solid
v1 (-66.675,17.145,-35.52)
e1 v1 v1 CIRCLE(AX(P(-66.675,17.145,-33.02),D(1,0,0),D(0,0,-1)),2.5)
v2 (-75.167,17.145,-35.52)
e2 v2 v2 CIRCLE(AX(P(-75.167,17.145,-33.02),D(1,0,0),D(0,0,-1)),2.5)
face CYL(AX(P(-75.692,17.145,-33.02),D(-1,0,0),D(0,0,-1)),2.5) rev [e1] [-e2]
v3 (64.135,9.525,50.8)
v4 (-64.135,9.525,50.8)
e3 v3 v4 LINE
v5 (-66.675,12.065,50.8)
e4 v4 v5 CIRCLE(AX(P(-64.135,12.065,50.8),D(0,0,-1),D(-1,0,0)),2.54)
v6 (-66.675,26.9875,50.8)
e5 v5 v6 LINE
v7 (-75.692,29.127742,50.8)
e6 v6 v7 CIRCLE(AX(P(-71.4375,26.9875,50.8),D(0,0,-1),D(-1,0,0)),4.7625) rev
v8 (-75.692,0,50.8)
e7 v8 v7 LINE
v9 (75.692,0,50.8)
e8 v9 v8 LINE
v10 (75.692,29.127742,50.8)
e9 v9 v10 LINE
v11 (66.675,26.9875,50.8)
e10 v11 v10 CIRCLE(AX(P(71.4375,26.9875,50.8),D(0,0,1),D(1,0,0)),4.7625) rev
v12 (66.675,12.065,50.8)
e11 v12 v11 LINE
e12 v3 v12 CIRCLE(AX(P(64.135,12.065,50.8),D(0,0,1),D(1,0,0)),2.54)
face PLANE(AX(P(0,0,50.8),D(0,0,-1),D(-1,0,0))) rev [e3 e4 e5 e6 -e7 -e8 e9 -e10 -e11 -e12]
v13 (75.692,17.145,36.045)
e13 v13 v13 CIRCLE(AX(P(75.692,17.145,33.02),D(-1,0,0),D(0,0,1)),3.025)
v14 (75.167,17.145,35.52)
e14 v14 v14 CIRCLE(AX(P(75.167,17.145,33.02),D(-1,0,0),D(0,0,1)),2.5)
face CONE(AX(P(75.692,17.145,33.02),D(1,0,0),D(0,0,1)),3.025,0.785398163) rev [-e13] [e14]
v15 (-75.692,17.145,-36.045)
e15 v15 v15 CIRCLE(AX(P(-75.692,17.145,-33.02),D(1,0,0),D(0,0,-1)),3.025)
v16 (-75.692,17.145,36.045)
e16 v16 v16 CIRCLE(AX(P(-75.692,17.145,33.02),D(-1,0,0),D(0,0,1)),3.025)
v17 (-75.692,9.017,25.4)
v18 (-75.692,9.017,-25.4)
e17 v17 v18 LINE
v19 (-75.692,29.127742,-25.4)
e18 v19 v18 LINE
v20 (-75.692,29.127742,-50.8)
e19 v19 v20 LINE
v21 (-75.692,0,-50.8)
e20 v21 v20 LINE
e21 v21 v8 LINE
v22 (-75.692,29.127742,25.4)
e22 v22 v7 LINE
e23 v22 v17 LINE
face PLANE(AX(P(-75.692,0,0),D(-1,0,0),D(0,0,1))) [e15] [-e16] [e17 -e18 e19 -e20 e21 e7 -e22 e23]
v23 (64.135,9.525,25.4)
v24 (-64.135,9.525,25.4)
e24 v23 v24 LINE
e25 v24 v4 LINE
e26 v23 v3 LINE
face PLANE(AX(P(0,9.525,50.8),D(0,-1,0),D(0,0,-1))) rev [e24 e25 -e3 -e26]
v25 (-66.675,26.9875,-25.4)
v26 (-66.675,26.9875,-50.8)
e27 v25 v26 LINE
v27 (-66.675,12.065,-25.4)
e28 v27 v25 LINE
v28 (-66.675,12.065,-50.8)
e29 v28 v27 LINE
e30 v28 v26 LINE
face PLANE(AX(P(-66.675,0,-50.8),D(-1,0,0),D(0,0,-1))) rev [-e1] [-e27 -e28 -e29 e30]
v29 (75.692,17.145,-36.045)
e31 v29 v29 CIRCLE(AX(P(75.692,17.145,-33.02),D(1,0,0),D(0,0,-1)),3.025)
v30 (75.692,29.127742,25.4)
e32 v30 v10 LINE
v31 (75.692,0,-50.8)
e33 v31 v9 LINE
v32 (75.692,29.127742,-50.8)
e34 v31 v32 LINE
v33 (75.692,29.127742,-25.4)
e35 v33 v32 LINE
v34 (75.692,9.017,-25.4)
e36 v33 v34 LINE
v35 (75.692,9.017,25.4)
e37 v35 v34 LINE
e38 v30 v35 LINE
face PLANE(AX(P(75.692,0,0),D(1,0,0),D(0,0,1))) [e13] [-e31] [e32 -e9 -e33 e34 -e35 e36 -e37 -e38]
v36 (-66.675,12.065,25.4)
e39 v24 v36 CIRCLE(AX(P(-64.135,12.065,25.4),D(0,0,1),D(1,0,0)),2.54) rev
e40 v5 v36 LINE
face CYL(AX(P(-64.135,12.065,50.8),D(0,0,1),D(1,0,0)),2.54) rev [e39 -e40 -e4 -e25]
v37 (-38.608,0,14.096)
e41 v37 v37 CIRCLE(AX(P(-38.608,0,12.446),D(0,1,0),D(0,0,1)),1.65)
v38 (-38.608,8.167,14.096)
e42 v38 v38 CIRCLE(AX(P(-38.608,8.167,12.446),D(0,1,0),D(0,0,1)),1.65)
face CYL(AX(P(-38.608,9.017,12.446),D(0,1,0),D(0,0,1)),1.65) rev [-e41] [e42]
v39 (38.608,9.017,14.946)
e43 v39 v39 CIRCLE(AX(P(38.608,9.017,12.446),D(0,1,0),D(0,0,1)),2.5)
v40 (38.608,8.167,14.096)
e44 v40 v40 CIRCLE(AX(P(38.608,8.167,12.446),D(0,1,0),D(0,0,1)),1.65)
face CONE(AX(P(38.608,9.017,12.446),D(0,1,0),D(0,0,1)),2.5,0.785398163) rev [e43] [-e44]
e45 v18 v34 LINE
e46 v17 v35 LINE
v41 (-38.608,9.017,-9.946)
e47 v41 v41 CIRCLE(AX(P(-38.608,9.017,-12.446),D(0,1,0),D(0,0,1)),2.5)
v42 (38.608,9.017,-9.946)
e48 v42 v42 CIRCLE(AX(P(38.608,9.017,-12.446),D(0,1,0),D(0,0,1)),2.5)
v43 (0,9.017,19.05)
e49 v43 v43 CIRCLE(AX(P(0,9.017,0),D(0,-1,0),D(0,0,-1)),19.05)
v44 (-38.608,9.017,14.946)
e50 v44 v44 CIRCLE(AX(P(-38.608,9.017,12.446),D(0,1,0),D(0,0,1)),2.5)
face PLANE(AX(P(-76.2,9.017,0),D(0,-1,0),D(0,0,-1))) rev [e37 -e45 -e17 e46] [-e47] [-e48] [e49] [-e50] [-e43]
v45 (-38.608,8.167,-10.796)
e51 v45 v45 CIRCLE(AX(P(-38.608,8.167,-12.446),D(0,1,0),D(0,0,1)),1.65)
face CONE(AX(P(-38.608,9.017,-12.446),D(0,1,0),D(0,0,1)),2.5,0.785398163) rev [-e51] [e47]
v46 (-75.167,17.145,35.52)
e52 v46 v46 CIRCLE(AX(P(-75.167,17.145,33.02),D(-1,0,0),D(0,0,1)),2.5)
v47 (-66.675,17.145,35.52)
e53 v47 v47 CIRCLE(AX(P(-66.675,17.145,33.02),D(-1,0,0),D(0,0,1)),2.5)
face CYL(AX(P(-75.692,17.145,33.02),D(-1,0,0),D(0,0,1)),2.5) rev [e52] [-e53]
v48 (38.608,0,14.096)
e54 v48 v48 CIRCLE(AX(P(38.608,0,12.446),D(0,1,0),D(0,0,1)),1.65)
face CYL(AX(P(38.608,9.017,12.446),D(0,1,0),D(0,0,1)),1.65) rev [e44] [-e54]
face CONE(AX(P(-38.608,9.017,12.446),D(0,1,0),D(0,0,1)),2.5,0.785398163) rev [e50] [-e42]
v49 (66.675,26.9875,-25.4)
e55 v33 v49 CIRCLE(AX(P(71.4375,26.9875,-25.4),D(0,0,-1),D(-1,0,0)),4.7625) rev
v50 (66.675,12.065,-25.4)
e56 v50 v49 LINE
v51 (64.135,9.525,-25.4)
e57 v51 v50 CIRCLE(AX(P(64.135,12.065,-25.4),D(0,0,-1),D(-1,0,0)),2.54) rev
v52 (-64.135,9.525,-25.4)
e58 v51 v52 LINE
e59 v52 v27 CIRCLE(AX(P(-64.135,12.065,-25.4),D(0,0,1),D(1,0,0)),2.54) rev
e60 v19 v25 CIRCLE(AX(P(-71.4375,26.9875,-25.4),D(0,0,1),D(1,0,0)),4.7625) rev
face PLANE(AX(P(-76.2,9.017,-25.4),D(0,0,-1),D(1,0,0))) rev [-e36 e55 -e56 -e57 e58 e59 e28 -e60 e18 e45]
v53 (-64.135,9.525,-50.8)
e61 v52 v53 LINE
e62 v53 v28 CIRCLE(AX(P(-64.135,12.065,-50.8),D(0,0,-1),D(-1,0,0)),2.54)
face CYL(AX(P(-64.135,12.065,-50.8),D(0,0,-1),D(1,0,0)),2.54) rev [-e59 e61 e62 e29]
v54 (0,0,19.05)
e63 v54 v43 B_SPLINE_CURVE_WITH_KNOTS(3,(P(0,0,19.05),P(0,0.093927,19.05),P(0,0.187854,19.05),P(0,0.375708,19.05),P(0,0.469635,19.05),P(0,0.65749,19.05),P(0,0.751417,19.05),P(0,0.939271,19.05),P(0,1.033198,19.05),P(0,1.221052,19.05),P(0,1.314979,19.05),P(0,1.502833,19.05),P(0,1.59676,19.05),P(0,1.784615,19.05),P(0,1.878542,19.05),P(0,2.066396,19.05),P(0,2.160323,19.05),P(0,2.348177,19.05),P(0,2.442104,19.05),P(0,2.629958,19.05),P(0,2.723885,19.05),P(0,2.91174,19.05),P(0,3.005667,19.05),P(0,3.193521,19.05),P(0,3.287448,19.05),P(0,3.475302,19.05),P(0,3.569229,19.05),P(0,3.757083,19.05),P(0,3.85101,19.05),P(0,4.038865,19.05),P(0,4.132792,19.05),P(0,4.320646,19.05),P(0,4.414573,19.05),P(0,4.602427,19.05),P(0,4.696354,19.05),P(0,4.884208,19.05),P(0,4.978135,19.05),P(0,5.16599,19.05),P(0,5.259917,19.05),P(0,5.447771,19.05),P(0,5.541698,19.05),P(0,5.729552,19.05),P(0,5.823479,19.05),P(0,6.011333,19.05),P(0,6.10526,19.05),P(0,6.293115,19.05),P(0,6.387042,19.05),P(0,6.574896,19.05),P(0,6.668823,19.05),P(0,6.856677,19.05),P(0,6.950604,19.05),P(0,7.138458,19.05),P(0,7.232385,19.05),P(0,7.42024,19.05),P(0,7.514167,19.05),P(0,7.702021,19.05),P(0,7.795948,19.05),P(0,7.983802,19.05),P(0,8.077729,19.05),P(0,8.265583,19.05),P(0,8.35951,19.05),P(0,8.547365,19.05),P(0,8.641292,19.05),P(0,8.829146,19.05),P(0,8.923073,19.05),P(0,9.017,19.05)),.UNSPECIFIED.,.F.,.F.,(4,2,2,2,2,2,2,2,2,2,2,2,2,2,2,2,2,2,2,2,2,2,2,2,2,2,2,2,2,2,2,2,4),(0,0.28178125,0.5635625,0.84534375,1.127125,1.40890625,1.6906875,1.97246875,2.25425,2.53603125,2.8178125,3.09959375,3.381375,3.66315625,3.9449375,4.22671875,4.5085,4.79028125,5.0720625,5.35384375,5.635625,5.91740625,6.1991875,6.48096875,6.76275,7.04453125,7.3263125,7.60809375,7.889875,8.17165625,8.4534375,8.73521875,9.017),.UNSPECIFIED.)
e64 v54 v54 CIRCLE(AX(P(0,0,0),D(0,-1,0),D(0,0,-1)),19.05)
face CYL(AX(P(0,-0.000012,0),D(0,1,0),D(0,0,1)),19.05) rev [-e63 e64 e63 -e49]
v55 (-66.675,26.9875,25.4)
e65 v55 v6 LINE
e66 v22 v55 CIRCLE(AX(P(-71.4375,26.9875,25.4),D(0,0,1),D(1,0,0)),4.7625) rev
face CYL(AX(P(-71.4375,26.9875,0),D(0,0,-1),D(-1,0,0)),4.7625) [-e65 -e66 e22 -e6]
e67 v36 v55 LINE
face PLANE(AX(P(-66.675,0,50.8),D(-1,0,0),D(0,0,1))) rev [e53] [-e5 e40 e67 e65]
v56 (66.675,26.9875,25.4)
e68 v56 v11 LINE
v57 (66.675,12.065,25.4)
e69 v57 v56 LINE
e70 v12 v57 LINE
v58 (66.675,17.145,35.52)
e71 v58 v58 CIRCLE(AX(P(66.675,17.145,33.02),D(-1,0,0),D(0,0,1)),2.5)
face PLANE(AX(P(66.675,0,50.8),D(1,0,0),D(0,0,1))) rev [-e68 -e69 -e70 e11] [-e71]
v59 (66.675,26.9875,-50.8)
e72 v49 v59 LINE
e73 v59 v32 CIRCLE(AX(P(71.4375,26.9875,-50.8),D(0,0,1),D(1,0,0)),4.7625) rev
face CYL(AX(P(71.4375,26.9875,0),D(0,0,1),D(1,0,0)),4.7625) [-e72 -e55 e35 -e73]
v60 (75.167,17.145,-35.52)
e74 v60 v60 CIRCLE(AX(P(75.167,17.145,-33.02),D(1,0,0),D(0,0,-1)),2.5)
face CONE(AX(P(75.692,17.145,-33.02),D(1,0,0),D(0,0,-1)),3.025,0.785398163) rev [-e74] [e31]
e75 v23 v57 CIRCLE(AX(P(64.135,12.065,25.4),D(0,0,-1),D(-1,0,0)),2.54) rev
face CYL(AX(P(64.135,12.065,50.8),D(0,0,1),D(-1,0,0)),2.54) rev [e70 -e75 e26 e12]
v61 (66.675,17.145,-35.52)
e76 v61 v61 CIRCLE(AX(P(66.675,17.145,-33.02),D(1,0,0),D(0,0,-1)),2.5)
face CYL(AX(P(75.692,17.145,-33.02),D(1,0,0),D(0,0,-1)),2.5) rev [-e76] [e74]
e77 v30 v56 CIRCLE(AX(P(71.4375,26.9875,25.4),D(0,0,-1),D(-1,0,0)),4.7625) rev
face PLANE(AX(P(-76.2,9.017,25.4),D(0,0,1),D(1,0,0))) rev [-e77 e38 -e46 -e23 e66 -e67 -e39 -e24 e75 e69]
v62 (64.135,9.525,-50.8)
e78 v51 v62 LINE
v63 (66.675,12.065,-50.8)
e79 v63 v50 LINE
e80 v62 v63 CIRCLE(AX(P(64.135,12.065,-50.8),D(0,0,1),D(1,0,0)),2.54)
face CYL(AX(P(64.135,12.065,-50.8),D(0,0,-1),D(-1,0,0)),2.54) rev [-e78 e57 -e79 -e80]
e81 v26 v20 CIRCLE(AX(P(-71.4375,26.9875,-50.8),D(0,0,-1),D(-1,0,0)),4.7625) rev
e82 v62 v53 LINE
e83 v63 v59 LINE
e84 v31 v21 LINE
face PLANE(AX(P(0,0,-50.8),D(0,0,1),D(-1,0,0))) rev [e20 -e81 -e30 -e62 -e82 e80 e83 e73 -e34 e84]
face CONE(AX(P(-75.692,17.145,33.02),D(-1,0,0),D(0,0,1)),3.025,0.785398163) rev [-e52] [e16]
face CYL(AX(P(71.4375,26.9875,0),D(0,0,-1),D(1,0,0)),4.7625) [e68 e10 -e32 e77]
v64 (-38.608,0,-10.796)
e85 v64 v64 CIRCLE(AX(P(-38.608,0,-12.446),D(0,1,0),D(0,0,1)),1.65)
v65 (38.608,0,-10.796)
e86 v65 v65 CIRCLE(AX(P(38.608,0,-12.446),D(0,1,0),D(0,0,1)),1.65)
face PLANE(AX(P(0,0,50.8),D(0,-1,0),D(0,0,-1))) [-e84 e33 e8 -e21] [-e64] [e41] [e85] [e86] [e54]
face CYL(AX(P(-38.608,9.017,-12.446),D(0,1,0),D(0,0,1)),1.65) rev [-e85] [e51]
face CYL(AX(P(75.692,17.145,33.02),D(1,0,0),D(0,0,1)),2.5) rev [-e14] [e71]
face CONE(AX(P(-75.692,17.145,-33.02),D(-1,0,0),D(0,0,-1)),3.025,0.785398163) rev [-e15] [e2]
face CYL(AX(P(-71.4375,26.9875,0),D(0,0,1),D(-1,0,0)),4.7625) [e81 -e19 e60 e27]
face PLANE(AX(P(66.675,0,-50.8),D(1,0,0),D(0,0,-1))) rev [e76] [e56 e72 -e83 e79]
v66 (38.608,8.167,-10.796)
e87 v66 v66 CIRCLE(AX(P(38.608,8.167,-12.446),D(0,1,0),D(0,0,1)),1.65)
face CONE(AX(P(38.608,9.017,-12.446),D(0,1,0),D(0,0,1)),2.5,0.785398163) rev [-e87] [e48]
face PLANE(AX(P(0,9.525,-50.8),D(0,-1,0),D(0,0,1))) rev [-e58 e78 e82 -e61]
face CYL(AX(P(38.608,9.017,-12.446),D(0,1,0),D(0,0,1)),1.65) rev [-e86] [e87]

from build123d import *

# Parameters (mm, degrees)
EXTRUDE_THIN1_DEPTH             = 50.8
FILLET1_RADIUS                  = 4.7625
FILLET1_LENGTH                  = 50.8
FILLET2_R                       = 2.54
CUT_EXTRUDE1_DEPTH              = 97.928543268
CUT_EXTRUDE1_DEPTH_BACK         = 97.928543268
SKETCH5_W                       = 25.4
SKETCH5_H                       = 22.733
CUT_EXTRUDE3_START              = -76.2
SKETCH8_W                       = 50.8
SKETCH8_H                       = 31.75
CUT_EXTRUDE3_DEPTH              = 0.508
M6X1_0_TAPPED_HOLE1_D           = 5
M6X1_0_TAPPED_HOLE1_CSINK_D     = 6.05
M6X1_0_TAPPED_HOLE1_CSINK_ANGLE = 90
MIRROR1_START                   = -50.8
MIRROR1_OUTLINE_W               = 151.384
MIRROR1_OUTLINE_H               = 9.017
MIRROR1_DEPTH                   = 101.6
MIRROR1_2_DEPTH                 = 15.2799999
MIRROR1_START_2                 = 35.5200001
MIRROR1_3_DEPTH                 = 15.2799999
MIRROR1_START_3                 = -30.5199999
MIRROR1_4_DEPTH                 = 5.1199999
MIRROR1_START_4                 = 25.4
MIRROR1_5_DEPTH                 = 5.1199999
MIRROR1_START_5                 = -35.5200001
MIRROR1_6_DEPTH                 = 5.0000002
MIRROR1_START_6                 = 30.5199999
MIRROR1_7_DEPTH                 = 5.0000002
CUT_EXTRUDE2_DEPTH              = 97.529691619
CUT_EXTRUDE2_DEPTH_BACK         = 97.529691619
SKETCH7_R                       = 19.05
M4X0_7_TAPPED_HOLE3_D           = 3.3
M4X0_7_TAPPED_HOLE3_CSINK_D     = 5
M4X0_7_TAPPED_HOLE3_CSINK_ANGLE = 90


with BuildPart() as part:
    # Sketch4 → Extrude-Thin1 (new body)
    with BuildSketch(Plane.XY):
        Polygon((0, 0), (-76.2, 0), (-76.2, 31.75), (-66.675, 31.75), (-66.675, 9.525), (0, 9.525), align=None)
    extrude(amount=EXTRUDE_THIN1_DEPTH)

    # Fillet1: full round fillet: the end face becomes a half cylinder, R = half its width
    fillet1_face = Plane((-71.4375, 31.75, 25.4), x_dir=(0, 0, -1), z_dir=(0, 1, 0))  # on the end face: x along it, z out of the body
    fillet1_slab = fillet1_face.offset(-FILLET1_RADIUS / 2) * Box(FILLET1_LENGTH, 2 * FILLET1_RADIUS, FILLET1_RADIUS, mode=Mode.PRIVATE)  # the body's end, R deep
    fillet1_round = Plane((-71.4375, 26.9875, 25.4), x_dir=(0, 1, 0), z_dir=(0, 0, -1)) * Cylinder(FILLET1_RADIUS, FILLET1_LENGTH, mode=Mode.PRIVATE)  # its axis R under the face
    add(fillet1_slab - fillet1_round, mode=Mode.SUBTRACT)

    # Fillet2
    fillet2_edges = [part.edges().sort_by_distance(p)[0] for p in [
        (-66.675, 9.525, 25.4),
    ]]
    fillet(fillet2_edges, radius=FILLET2_R)

    # Sketch5 → Cut-Extrude1 (cut, two sides: drawn at the far end of the back side and taken through both)
    with BuildSketch(Plane(origin=(0, 0, 0), x_dir=(0, 0, -1), z_dir=(1, 0, 0)).offset(-CUT_EXTRUDE1_DEPTH_BACK)):
        with Locations((-12.7, 20.3835)):
            Rectangle(SKETCH5_W, SKETCH5_H)
    extrude(amount=CUT_EXTRUDE1_DEPTH + CUT_EXTRUDE1_DEPTH_BACK, mode=Mode.SUBTRACT)

    # Sketch8 → Cut-Extrude3 (cut)
    with BuildSketch(Plane(origin=(0, 0, 0), x_dir=(0, 0, -1), z_dir=(1, 0, 0)).offset(CUT_EXTRUDE3_START)):
        with Locations((-25.4, 15.875)):
            Rectangle(SKETCH8_W, SKETCH8_H)
    extrude(amount=CUT_EXTRUDE3_DEPTH, mode=Mode.SUBTRACT)

    # M6x1.0 Tapped Hole1 (through all)
    with Locations(Plane.ZY.offset(75.692)):
        with Locations((33.02, 17.145)):
            CounterSinkHole(M6X1_0_TAPPED_HOLE1_D / 2, M6X1_0_TAPPED_HOLE1_CSINK_D / 2, counter_sink_angle=M6X1_0_TAPPED_HOLE1_CSINK_ANGLE)

    # Mirror1: read off the stored shape, not the designer's step
    # Mirror1 outline → Mirror1 (add)
    with BuildSketch(Plane.XY.offset(MIRROR1_START)):
        with Locations((0, 4.5085)):
            Rectangle(MIRROR1_OUTLINE_W, MIRROR1_OUTLINE_H)
    extrude(amount=MIRROR1_DEPTH)

    # Mirror1 2 outline → Mirror1 2 (add)
    with BuildSketch(Plane.XY.offset(MIRROR1_START)):
        with BuildLine():
            Line((-66.675, 12.065), (-66.675, 26.9875))
            ThreePointArc((-66.675, 26.9875), (-70.337647737, 31.621259947), (-75.692, 29.127742042))
            Line((-75.692, 29.127742042), (-75.692, 9.017))
            Line((-75.692, 9.017), (75.692, 9.017))
            Line((75.692, 9.017), (75.692, 29.127742042))
            ThreePointArc((75.692, 29.127742042), (70.337647737, 31.621259947), (66.675, 26.9875))
            Line((66.675, 26.9875), (66.675, 12.065))
            ThreePointArc((66.675, 12.065), (65.931051224, 10.268948776), (64.135, 9.525))
            Line((64.135, 9.525), (-64.135, 9.525))
            ThreePointArc((-64.135, 9.525), (-65.931051224, 10.268948776), (-66.675, 12.065))
        make_face()
    extrude(amount=MIRROR1_2_DEPTH)

    # Mirror1 3 outline → Mirror1 3 (add)
    with BuildSketch(Plane.XY.offset(MIRROR1_START_2)):
        with BuildLine():
            Line((0, 9.525), (0, 9.017))
            Line((0, 9.017), (75.692, 9.017))
            Line((75.692, 9.017), (75.692, 29.127742042))
            ThreePointArc((75.692, 29.127742042), (70.337647737, 31.621259947), (66.675, 26.9875))
            Line((66.675, 26.9875), (66.675, 12.065))
            ThreePointArc((66.675, 12.065), (65.931051224, 10.268948776), (64.135, 9.525))
            Line((64.135, 9.525), (0, 9.525))
        make_face()
    extrude(amount=MIRROR1_3_DEPTH)

    # Mirror1 4 outline → Mirror1 4 (add)
    with BuildSketch(Plane.XY.offset(MIRROR1_START_3)):
        with BuildLine():
            Line((-66.675, 12.065), (-66.675, 26.9875))
            ThreePointArc((-66.675, 26.9875), (-70.337647737, 31.621259947), (-75.692, 29.127742042))
            Line((-75.692, 29.127742042), (-75.692, 9.017))
            Line((-75.692, 9.017), (75.692, 9.017))
            Line((75.692, 9.017), (75.692, 29.127742042))
            ThreePointArc((75.692, 29.127742042), (70.337647737, 31.621259947), (66.675, 26.9875))
            Line((66.675, 26.9875), (66.675, 12.065))
            ThreePointArc((66.675, 12.065), (65.931051224, 10.268948776), (64.135, 9.525))
            Line((64.135, 9.525), (-64.135, 9.525))
            ThreePointArc((-64.135, 9.525), (-65.931051224, 10.268948776), (-66.675, 12.065))
        make_face()
    extrude(amount=MIRROR1_4_DEPTH)

    # Mirror1 5 outline → Mirror1 5 (add)
    with BuildSketch(Plane.XY.offset(MIRROR1_START_4)):
        with BuildLine():
            Line((0, 9.525), (0, 9.017))
            Line((0, 9.017), (75.692, 9.017))
            Line((75.692, 9.017), (75.692, 29.127742042))
            ThreePointArc((75.692, 29.127742042), (70.337647737, 31.621259947), (66.675, 26.9875))
            Line((66.675, 26.9875), (66.675, 12.065))
            ThreePointArc((66.675, 12.065), (65.931051224, 10.268948776), (64.135, 9.525))
            Line((64.135, 9.525), (0, 9.525))
        make_face()
    extrude(amount=MIRROR1_5_DEPTH)

    # Mirror1 6 outline → Mirror1 6 (add)
    with BuildSketch(Plane.XY.offset(MIRROR1_START_5)):
        with BuildLine():
            Line((-66.675, 12.065), (-66.675, 26.9875))
            ThreePointArc((-66.675, 26.9875), (-70.337647737, 31.621259947), (-75.692, 29.127742042))
            Line((-75.692, 29.127742042), (-75.692, 9.017))
            Line((-75.692, 9.017), (75.692, 9.017))
            Line((75.692, 9.017), (75.692, 29.127742042))
            ThreePointArc((75.692, 29.127742042), (70.337647737, 31.621259947), (66.675, 26.9875))
            Line((66.675, 26.9875), (66.675, 12.065))
            ThreePointArc((66.675, 12.065), (65.931051224, 10.268948776), (64.135, 9.525))
            Line((64.135, 9.525), (-64.135, 9.525))
            ThreePointArc((-64.135, 9.525), (-65.931051224, 10.268948776), (-66.675, 12.065))
        make_face()
    extrude(amount=MIRROR1_6_DEPTH)

    # Mirror1 7 outline → Mirror1 7 (add)
    with BuildSketch(Plane.XY.offset(MIRROR1_START_6)):
        with BuildLine():
            Line((0, 9.525), (0, 9.017))
            Line((0, 9.017), (75.692, 9.017))
            Line((75.692, 9.017), (75.692, 29.127742042))
            ThreePointArc((75.692, 29.127742042), (70.337647737, 31.621259947), (66.675, 26.9875))
            Line((66.675, 26.9875), (66.675, 12.065))
            ThreePointArc((66.675, 12.065), (65.931051224, 10.268948776), (64.135, 9.525))
            Line((64.135, 9.525), (0, 9.525))
        make_face()
    extrude(amount=MIRROR1_7_DEPTH)

    # Mirror1 8 outline → Mirror1 8 (revolve, cut)
    with BuildSketch(Plane(origin=(0, 17.145, 33.02), x_dir=(0, 1, 0), z_dir=(0, 0, -1))):
        Polygon((0, 66.675), (2.5, 66.675), (2.5, 75.167), (3.025, 75.692), (0, 75.692), align=None)
    revolve(axis=Axis((0, 17.145, 33.02), (1, 0, 0)), mode=Mode.SUBTRACT)

    # Mirror1 9 outline → Mirror1 9 (revolve, cut)
    with BuildSketch(Plane(origin=(0, 17.145, -33.02), x_dir=(0, 1, 0), z_dir=(0, 0, -1))):
        Polygon((2.5, -75.167), (2.5, -66.675), (0, -66.675), (0, -75.692), (3.025, -75.692), align=None)
        Polygon((0, 66.675), (2.5, 66.675), (2.5, 75.167), (3.025, 75.692), (0, 75.692), align=None)
    revolve(axis=Axis((0, 17.145, -33.02), (1, 0, 0)), mode=Mode.SUBTRACT)

    # Sketch7 → Cut-Extrude2 (cut, two sides: drawn at the far end of the back side and taken through both)
    with BuildSketch(Plane(origin=(0, 0, 0), x_dir=(1, 0, 0), z_dir=(0, 1, 0)).offset(-CUT_EXTRUDE2_DEPTH_BACK)):
        with Locations(Location((0, 0, 0), (0, 0, 270))):
            Circle(SKETCH7_R)
    extrude(amount=CUT_EXTRUDE2_DEPTH + CUT_EXTRUDE2_DEPTH_BACK, mode=Mode.SUBTRACT)

    # M4x0.7 Tapped Hole3 (through all)
    with Locations(Plane(origin=(0, 9.017, 0), x_dir=(1, 0, 0), z_dir=(0, 1, 0))):
        with Locations((38.608, -12.446), (-38.608, -12.446), (-38.608, 12.446), (38.608, 12.446)):
            CounterSinkHole(M4X0_7_TAPPED_HOLE3_D / 2, M4X0_7_TAPPED_HOLE3_CSINK_D / 2, counter_sink_angle=M4X0_7_TAPPED_HOLE3_CSINK_ANGLE)


solid = part.part
